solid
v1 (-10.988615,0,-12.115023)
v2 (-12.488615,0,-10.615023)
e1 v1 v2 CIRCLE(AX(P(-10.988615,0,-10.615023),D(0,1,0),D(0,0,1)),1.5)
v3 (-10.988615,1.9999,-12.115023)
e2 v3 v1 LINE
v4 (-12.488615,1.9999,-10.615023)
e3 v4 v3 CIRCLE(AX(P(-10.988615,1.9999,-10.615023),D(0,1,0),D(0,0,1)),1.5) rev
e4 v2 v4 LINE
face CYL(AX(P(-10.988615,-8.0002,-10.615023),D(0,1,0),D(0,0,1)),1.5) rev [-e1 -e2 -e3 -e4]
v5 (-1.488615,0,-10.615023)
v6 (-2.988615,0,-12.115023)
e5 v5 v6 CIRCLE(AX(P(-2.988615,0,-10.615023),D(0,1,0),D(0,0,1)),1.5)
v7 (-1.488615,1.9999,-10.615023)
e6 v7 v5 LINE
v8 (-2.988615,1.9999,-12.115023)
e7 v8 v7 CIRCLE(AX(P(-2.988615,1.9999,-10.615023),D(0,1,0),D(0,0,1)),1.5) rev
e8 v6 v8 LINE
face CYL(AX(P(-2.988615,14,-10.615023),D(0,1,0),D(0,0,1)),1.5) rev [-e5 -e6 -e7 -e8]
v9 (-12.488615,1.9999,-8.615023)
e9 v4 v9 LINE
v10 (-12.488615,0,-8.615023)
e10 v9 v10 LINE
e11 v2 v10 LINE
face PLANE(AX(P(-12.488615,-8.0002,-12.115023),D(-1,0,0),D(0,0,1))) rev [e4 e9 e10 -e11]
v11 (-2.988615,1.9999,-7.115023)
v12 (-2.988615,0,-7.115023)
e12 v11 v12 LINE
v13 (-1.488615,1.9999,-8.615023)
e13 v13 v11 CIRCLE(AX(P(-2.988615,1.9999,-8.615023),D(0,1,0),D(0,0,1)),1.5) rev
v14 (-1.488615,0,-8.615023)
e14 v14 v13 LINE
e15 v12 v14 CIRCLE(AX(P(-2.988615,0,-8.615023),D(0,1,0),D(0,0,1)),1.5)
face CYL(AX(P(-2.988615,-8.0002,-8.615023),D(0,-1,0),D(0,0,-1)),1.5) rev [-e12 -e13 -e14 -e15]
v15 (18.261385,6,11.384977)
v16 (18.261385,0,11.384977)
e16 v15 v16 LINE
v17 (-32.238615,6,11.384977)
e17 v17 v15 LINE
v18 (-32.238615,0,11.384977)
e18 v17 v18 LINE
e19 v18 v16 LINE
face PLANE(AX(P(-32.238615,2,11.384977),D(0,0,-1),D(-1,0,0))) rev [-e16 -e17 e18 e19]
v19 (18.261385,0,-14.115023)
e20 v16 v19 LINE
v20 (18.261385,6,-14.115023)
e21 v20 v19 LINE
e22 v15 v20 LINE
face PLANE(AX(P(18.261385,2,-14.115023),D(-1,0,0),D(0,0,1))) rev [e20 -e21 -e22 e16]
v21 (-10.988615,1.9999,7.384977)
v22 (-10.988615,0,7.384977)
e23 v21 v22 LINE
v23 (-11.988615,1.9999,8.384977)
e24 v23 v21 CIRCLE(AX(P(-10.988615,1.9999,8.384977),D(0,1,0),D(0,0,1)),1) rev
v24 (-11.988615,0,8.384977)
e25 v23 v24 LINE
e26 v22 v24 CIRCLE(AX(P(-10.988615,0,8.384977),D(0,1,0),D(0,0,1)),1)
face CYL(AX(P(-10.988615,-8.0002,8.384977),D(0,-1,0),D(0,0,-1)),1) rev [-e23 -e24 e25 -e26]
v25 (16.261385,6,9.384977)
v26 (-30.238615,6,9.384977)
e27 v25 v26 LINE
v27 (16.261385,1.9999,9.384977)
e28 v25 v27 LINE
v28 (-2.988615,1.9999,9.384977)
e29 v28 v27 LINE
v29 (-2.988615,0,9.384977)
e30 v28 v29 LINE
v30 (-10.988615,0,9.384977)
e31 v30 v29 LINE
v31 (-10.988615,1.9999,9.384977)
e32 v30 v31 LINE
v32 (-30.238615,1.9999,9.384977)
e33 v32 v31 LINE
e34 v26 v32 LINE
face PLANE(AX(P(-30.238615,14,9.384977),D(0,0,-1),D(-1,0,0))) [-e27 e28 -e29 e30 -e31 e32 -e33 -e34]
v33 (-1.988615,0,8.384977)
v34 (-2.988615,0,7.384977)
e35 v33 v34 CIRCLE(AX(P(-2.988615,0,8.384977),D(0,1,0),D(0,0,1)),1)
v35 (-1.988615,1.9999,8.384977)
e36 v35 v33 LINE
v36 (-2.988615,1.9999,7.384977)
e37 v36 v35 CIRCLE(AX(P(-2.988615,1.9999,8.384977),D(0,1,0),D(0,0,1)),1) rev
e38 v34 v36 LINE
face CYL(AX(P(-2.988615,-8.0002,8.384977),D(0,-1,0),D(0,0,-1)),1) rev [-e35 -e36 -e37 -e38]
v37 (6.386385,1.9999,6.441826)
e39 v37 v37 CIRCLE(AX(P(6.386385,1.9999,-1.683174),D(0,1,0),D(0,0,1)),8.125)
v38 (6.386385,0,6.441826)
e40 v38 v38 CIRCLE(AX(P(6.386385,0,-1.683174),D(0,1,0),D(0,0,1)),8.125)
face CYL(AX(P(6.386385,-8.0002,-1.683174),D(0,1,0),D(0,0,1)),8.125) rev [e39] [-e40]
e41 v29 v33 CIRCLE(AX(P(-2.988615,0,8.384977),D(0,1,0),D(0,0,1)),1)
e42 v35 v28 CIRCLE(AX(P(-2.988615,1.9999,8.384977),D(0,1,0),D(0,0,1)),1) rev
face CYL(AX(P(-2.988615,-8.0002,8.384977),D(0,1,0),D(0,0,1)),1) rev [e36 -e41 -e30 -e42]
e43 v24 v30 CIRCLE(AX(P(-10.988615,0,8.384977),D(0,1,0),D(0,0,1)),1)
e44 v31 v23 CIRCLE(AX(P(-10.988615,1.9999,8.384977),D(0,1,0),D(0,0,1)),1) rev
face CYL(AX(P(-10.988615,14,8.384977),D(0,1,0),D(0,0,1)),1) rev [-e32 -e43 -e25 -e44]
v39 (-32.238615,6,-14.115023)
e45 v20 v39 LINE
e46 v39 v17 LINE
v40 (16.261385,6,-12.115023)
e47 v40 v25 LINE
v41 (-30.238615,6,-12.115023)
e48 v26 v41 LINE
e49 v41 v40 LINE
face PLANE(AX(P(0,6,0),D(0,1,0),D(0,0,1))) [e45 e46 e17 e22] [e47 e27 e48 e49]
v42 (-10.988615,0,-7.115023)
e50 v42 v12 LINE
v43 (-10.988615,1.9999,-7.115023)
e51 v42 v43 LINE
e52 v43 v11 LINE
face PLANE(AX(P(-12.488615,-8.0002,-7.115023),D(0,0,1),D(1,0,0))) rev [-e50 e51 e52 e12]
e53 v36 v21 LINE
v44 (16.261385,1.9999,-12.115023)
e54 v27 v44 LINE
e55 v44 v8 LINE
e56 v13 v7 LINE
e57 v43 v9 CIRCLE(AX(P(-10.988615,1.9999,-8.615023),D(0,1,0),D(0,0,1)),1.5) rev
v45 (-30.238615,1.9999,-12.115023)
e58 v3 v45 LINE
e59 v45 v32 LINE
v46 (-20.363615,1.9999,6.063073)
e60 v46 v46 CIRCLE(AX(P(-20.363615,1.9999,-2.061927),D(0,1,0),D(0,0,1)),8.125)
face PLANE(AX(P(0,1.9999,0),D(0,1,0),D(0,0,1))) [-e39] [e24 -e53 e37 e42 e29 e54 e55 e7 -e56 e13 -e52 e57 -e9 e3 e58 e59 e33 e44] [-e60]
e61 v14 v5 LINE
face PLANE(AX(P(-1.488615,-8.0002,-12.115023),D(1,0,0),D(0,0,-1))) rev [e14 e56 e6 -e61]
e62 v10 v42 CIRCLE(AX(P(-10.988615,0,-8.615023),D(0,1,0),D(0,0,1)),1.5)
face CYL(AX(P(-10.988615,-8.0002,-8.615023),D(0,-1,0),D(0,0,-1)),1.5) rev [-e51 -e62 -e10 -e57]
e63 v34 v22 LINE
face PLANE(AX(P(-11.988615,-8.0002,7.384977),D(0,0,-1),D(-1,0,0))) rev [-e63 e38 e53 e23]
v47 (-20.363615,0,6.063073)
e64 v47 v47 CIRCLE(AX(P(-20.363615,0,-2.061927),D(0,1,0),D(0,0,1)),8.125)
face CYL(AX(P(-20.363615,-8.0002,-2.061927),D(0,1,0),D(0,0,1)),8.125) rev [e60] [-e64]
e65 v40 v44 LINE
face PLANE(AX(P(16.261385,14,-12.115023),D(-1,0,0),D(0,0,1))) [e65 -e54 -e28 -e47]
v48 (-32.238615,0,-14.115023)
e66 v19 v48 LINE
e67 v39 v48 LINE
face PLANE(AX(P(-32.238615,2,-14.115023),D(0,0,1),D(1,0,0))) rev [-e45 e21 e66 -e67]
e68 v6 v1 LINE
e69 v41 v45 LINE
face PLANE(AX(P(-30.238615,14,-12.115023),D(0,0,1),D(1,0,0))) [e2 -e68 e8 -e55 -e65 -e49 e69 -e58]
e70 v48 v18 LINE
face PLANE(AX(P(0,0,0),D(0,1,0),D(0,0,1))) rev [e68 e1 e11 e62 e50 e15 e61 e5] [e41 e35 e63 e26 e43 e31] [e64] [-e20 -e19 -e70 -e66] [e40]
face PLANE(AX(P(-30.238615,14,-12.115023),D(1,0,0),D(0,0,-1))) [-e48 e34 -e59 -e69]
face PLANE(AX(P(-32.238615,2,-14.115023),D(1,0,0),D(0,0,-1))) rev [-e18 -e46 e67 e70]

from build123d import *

# Parameters (mm, degrees)
SKETCH1_W               = 50.5
SKETCH1_H               = 25.5
BOSS_EXTRUDE1_DEPTH     = 2
MOVE_FACE1_BY           = 5
CUT_EXTRUDE1_DEPTH      = 12
CUT_EXTRUDE1_DEPTH_BACK = 0.0001
SKETCH2_W               = 46.5
SKETCH2_H               = 21.5
SKETCH3_R               = 8.125
CUT_EXTRUDE2_DEPTH      = 10.0001
SKETCH4_W               = 11
SKETCH4_H               = 5
CUT_EXTRUDE3_DEPTH      = 10.0001
FILLET1_R               = 1.5
SKETCH5_W               = 10
SKETCH5_H               = 2
CUT_EXTRUDE4_DEPTH      = 10.0001
FILLET2_R               = 1
MOVE_START              = 6
MOVE_FACE2_OUTLINE_W    = 50.5
MOVE_FACE2_OUTLINE_H    = 25.5
MOVE_FACE2_OUTLINE_W_2  = 46.5
MOVE_FACE2_OUTLINE_H_2  = 21.5
MOVE_FACE2_DEPTH        = 1


# Read off the part's stored shape, not the designer's step: Move Face2
with BuildPart() as part:
    # Sketch1 → Boss-Extrude1 (new body)
    with BuildSketch(Plane(origin=(0, 0, 0), x_dir=(1, 0, 0), z_dir=(0, 1, 0))):
        with Locations((-6.98861547, 1.365023474)):
            Rectangle(SKETCH1_W, SKETCH1_H)
    extrude(amount=BOSS_EXTRUDE1_DEPTH)

    # Move Face1: a face moved outward by 5.0
    extrude(part.faces().sort_by_distance((-6.98861547, 2, -1.365023474))[0], amount=MOVE_FACE1_BY, dir=(0, 1, 0))

    # Sketch2 → Cut-Extrude1 (cut, two sides: drawn at the far end of the back side and taken through both)
    with BuildSketch(Plane(origin=(0, 2, 0), x_dir=(1, 0, 0), z_dir=(0, 1, 0)).offset(-CUT_EXTRUDE1_DEPTH_BACK)):
        with Locations((-6.98861547, 1.365023474)):
            Rectangle(SKETCH2_W, SKETCH2_H)
    extrude(amount=CUT_EXTRUDE1_DEPTH + CUT_EXTRUDE1_DEPTH_BACK, mode=Mode.SUBTRACT)

    # Sketch3 → Cut-Extrude2 (cut)
    with BuildSketch(Plane(origin=(0, 1.9999, 0), x_dir=(1, 0, 0), z_dir=(0, 1, 0))):
        with Locations(Location((-20.36361547, 2.06192688, 0), (0, 0, 270))):
            Circle(SKETCH3_R)
        with Locations(Location((6.38638453, 1.683174436, 0), (0, 0, 270))):
            Circle(SKETCH3_R)
    extrude(amount=-CUT_EXTRUDE2_DEPTH, mode=Mode.SUBTRACT)

    # Sketch4 → Cut-Extrude3 (cut)
    with BuildSketch(Plane(origin=(0, 1.9999, 0), x_dir=(1, 0, 0), z_dir=(0, 1, 0))):
        with Locations((-6.98861547, 9.615023474)):
            Rectangle(SKETCH4_W, SKETCH4_H)
    extrude(amount=-CUT_EXTRUDE3_DEPTH, mode=Mode.SUBTRACT)

    # Fillet1
    fillet1_edges = [part.edges().sort_by_distance(p)[0] for p in [
        (-12.48861547, 0.99995, -7.115023474),
        (-12.48861547, 0.99995, -12.115023474),
        (-1.48861547, 0.99995, -12.115023474),
        (-1.48861547, 0.99995, -7.115023474),
    ]]
    fillet(fillet1_edges, radius=FILLET1_R)

    # Sketch5 → Cut-Extrude4 (cut)
    with BuildSketch(Plane(origin=(0, 1.9999, 0), x_dir=(1, 0, 0), z_dir=(0, 1, 0))):
        with Locations((-6.98861547, -8.384976526)):
            Rectangle(SKETCH5_W, SKETCH5_H)
    extrude(amount=-CUT_EXTRUDE4_DEPTH, mode=Mode.SUBTRACT)

    # Fillet2
    fillet2_edges = [part.edges().sort_by_distance(p)[0] for p in [
        (-1.98861547, 0.99995, 9.384976526),
        (-1.98861547, 0.99995, 7.384976526),
        (-11.98861547, 0.99995, 7.384976526),
        (-11.98861547, 0.99995, 9.384976526),
    ]]
    fillet(fillet2_edges, radius=FILLET2_R - 0.0001)  # a hair under: the kernel refuses the full size

    # Move Face2 outline → Move Face2 (cut)
    with BuildSketch(Plane(origin=(0, 0, 0), x_dir=(1, 0, 0), z_dir=(0, 1, 0)).offset(MOVE_START)):
        with Locations((-6.98861547, 1.365023474)):
            Rectangle(MOVE_FACE2_OUTLINE_W, MOVE_FACE2_OUTLINE_H)
        with Locations((-6.98861547, 1.365023474)):
            Rectangle(MOVE_FACE2_OUTLINE_W_2, MOVE_FACE2_OUTLINE_H_2, mode=Mode.SUBTRACT)
    extrude(amount=MOVE_FACE2_DEPTH, mode=Mode.SUBTRACT)


solid = part.part
